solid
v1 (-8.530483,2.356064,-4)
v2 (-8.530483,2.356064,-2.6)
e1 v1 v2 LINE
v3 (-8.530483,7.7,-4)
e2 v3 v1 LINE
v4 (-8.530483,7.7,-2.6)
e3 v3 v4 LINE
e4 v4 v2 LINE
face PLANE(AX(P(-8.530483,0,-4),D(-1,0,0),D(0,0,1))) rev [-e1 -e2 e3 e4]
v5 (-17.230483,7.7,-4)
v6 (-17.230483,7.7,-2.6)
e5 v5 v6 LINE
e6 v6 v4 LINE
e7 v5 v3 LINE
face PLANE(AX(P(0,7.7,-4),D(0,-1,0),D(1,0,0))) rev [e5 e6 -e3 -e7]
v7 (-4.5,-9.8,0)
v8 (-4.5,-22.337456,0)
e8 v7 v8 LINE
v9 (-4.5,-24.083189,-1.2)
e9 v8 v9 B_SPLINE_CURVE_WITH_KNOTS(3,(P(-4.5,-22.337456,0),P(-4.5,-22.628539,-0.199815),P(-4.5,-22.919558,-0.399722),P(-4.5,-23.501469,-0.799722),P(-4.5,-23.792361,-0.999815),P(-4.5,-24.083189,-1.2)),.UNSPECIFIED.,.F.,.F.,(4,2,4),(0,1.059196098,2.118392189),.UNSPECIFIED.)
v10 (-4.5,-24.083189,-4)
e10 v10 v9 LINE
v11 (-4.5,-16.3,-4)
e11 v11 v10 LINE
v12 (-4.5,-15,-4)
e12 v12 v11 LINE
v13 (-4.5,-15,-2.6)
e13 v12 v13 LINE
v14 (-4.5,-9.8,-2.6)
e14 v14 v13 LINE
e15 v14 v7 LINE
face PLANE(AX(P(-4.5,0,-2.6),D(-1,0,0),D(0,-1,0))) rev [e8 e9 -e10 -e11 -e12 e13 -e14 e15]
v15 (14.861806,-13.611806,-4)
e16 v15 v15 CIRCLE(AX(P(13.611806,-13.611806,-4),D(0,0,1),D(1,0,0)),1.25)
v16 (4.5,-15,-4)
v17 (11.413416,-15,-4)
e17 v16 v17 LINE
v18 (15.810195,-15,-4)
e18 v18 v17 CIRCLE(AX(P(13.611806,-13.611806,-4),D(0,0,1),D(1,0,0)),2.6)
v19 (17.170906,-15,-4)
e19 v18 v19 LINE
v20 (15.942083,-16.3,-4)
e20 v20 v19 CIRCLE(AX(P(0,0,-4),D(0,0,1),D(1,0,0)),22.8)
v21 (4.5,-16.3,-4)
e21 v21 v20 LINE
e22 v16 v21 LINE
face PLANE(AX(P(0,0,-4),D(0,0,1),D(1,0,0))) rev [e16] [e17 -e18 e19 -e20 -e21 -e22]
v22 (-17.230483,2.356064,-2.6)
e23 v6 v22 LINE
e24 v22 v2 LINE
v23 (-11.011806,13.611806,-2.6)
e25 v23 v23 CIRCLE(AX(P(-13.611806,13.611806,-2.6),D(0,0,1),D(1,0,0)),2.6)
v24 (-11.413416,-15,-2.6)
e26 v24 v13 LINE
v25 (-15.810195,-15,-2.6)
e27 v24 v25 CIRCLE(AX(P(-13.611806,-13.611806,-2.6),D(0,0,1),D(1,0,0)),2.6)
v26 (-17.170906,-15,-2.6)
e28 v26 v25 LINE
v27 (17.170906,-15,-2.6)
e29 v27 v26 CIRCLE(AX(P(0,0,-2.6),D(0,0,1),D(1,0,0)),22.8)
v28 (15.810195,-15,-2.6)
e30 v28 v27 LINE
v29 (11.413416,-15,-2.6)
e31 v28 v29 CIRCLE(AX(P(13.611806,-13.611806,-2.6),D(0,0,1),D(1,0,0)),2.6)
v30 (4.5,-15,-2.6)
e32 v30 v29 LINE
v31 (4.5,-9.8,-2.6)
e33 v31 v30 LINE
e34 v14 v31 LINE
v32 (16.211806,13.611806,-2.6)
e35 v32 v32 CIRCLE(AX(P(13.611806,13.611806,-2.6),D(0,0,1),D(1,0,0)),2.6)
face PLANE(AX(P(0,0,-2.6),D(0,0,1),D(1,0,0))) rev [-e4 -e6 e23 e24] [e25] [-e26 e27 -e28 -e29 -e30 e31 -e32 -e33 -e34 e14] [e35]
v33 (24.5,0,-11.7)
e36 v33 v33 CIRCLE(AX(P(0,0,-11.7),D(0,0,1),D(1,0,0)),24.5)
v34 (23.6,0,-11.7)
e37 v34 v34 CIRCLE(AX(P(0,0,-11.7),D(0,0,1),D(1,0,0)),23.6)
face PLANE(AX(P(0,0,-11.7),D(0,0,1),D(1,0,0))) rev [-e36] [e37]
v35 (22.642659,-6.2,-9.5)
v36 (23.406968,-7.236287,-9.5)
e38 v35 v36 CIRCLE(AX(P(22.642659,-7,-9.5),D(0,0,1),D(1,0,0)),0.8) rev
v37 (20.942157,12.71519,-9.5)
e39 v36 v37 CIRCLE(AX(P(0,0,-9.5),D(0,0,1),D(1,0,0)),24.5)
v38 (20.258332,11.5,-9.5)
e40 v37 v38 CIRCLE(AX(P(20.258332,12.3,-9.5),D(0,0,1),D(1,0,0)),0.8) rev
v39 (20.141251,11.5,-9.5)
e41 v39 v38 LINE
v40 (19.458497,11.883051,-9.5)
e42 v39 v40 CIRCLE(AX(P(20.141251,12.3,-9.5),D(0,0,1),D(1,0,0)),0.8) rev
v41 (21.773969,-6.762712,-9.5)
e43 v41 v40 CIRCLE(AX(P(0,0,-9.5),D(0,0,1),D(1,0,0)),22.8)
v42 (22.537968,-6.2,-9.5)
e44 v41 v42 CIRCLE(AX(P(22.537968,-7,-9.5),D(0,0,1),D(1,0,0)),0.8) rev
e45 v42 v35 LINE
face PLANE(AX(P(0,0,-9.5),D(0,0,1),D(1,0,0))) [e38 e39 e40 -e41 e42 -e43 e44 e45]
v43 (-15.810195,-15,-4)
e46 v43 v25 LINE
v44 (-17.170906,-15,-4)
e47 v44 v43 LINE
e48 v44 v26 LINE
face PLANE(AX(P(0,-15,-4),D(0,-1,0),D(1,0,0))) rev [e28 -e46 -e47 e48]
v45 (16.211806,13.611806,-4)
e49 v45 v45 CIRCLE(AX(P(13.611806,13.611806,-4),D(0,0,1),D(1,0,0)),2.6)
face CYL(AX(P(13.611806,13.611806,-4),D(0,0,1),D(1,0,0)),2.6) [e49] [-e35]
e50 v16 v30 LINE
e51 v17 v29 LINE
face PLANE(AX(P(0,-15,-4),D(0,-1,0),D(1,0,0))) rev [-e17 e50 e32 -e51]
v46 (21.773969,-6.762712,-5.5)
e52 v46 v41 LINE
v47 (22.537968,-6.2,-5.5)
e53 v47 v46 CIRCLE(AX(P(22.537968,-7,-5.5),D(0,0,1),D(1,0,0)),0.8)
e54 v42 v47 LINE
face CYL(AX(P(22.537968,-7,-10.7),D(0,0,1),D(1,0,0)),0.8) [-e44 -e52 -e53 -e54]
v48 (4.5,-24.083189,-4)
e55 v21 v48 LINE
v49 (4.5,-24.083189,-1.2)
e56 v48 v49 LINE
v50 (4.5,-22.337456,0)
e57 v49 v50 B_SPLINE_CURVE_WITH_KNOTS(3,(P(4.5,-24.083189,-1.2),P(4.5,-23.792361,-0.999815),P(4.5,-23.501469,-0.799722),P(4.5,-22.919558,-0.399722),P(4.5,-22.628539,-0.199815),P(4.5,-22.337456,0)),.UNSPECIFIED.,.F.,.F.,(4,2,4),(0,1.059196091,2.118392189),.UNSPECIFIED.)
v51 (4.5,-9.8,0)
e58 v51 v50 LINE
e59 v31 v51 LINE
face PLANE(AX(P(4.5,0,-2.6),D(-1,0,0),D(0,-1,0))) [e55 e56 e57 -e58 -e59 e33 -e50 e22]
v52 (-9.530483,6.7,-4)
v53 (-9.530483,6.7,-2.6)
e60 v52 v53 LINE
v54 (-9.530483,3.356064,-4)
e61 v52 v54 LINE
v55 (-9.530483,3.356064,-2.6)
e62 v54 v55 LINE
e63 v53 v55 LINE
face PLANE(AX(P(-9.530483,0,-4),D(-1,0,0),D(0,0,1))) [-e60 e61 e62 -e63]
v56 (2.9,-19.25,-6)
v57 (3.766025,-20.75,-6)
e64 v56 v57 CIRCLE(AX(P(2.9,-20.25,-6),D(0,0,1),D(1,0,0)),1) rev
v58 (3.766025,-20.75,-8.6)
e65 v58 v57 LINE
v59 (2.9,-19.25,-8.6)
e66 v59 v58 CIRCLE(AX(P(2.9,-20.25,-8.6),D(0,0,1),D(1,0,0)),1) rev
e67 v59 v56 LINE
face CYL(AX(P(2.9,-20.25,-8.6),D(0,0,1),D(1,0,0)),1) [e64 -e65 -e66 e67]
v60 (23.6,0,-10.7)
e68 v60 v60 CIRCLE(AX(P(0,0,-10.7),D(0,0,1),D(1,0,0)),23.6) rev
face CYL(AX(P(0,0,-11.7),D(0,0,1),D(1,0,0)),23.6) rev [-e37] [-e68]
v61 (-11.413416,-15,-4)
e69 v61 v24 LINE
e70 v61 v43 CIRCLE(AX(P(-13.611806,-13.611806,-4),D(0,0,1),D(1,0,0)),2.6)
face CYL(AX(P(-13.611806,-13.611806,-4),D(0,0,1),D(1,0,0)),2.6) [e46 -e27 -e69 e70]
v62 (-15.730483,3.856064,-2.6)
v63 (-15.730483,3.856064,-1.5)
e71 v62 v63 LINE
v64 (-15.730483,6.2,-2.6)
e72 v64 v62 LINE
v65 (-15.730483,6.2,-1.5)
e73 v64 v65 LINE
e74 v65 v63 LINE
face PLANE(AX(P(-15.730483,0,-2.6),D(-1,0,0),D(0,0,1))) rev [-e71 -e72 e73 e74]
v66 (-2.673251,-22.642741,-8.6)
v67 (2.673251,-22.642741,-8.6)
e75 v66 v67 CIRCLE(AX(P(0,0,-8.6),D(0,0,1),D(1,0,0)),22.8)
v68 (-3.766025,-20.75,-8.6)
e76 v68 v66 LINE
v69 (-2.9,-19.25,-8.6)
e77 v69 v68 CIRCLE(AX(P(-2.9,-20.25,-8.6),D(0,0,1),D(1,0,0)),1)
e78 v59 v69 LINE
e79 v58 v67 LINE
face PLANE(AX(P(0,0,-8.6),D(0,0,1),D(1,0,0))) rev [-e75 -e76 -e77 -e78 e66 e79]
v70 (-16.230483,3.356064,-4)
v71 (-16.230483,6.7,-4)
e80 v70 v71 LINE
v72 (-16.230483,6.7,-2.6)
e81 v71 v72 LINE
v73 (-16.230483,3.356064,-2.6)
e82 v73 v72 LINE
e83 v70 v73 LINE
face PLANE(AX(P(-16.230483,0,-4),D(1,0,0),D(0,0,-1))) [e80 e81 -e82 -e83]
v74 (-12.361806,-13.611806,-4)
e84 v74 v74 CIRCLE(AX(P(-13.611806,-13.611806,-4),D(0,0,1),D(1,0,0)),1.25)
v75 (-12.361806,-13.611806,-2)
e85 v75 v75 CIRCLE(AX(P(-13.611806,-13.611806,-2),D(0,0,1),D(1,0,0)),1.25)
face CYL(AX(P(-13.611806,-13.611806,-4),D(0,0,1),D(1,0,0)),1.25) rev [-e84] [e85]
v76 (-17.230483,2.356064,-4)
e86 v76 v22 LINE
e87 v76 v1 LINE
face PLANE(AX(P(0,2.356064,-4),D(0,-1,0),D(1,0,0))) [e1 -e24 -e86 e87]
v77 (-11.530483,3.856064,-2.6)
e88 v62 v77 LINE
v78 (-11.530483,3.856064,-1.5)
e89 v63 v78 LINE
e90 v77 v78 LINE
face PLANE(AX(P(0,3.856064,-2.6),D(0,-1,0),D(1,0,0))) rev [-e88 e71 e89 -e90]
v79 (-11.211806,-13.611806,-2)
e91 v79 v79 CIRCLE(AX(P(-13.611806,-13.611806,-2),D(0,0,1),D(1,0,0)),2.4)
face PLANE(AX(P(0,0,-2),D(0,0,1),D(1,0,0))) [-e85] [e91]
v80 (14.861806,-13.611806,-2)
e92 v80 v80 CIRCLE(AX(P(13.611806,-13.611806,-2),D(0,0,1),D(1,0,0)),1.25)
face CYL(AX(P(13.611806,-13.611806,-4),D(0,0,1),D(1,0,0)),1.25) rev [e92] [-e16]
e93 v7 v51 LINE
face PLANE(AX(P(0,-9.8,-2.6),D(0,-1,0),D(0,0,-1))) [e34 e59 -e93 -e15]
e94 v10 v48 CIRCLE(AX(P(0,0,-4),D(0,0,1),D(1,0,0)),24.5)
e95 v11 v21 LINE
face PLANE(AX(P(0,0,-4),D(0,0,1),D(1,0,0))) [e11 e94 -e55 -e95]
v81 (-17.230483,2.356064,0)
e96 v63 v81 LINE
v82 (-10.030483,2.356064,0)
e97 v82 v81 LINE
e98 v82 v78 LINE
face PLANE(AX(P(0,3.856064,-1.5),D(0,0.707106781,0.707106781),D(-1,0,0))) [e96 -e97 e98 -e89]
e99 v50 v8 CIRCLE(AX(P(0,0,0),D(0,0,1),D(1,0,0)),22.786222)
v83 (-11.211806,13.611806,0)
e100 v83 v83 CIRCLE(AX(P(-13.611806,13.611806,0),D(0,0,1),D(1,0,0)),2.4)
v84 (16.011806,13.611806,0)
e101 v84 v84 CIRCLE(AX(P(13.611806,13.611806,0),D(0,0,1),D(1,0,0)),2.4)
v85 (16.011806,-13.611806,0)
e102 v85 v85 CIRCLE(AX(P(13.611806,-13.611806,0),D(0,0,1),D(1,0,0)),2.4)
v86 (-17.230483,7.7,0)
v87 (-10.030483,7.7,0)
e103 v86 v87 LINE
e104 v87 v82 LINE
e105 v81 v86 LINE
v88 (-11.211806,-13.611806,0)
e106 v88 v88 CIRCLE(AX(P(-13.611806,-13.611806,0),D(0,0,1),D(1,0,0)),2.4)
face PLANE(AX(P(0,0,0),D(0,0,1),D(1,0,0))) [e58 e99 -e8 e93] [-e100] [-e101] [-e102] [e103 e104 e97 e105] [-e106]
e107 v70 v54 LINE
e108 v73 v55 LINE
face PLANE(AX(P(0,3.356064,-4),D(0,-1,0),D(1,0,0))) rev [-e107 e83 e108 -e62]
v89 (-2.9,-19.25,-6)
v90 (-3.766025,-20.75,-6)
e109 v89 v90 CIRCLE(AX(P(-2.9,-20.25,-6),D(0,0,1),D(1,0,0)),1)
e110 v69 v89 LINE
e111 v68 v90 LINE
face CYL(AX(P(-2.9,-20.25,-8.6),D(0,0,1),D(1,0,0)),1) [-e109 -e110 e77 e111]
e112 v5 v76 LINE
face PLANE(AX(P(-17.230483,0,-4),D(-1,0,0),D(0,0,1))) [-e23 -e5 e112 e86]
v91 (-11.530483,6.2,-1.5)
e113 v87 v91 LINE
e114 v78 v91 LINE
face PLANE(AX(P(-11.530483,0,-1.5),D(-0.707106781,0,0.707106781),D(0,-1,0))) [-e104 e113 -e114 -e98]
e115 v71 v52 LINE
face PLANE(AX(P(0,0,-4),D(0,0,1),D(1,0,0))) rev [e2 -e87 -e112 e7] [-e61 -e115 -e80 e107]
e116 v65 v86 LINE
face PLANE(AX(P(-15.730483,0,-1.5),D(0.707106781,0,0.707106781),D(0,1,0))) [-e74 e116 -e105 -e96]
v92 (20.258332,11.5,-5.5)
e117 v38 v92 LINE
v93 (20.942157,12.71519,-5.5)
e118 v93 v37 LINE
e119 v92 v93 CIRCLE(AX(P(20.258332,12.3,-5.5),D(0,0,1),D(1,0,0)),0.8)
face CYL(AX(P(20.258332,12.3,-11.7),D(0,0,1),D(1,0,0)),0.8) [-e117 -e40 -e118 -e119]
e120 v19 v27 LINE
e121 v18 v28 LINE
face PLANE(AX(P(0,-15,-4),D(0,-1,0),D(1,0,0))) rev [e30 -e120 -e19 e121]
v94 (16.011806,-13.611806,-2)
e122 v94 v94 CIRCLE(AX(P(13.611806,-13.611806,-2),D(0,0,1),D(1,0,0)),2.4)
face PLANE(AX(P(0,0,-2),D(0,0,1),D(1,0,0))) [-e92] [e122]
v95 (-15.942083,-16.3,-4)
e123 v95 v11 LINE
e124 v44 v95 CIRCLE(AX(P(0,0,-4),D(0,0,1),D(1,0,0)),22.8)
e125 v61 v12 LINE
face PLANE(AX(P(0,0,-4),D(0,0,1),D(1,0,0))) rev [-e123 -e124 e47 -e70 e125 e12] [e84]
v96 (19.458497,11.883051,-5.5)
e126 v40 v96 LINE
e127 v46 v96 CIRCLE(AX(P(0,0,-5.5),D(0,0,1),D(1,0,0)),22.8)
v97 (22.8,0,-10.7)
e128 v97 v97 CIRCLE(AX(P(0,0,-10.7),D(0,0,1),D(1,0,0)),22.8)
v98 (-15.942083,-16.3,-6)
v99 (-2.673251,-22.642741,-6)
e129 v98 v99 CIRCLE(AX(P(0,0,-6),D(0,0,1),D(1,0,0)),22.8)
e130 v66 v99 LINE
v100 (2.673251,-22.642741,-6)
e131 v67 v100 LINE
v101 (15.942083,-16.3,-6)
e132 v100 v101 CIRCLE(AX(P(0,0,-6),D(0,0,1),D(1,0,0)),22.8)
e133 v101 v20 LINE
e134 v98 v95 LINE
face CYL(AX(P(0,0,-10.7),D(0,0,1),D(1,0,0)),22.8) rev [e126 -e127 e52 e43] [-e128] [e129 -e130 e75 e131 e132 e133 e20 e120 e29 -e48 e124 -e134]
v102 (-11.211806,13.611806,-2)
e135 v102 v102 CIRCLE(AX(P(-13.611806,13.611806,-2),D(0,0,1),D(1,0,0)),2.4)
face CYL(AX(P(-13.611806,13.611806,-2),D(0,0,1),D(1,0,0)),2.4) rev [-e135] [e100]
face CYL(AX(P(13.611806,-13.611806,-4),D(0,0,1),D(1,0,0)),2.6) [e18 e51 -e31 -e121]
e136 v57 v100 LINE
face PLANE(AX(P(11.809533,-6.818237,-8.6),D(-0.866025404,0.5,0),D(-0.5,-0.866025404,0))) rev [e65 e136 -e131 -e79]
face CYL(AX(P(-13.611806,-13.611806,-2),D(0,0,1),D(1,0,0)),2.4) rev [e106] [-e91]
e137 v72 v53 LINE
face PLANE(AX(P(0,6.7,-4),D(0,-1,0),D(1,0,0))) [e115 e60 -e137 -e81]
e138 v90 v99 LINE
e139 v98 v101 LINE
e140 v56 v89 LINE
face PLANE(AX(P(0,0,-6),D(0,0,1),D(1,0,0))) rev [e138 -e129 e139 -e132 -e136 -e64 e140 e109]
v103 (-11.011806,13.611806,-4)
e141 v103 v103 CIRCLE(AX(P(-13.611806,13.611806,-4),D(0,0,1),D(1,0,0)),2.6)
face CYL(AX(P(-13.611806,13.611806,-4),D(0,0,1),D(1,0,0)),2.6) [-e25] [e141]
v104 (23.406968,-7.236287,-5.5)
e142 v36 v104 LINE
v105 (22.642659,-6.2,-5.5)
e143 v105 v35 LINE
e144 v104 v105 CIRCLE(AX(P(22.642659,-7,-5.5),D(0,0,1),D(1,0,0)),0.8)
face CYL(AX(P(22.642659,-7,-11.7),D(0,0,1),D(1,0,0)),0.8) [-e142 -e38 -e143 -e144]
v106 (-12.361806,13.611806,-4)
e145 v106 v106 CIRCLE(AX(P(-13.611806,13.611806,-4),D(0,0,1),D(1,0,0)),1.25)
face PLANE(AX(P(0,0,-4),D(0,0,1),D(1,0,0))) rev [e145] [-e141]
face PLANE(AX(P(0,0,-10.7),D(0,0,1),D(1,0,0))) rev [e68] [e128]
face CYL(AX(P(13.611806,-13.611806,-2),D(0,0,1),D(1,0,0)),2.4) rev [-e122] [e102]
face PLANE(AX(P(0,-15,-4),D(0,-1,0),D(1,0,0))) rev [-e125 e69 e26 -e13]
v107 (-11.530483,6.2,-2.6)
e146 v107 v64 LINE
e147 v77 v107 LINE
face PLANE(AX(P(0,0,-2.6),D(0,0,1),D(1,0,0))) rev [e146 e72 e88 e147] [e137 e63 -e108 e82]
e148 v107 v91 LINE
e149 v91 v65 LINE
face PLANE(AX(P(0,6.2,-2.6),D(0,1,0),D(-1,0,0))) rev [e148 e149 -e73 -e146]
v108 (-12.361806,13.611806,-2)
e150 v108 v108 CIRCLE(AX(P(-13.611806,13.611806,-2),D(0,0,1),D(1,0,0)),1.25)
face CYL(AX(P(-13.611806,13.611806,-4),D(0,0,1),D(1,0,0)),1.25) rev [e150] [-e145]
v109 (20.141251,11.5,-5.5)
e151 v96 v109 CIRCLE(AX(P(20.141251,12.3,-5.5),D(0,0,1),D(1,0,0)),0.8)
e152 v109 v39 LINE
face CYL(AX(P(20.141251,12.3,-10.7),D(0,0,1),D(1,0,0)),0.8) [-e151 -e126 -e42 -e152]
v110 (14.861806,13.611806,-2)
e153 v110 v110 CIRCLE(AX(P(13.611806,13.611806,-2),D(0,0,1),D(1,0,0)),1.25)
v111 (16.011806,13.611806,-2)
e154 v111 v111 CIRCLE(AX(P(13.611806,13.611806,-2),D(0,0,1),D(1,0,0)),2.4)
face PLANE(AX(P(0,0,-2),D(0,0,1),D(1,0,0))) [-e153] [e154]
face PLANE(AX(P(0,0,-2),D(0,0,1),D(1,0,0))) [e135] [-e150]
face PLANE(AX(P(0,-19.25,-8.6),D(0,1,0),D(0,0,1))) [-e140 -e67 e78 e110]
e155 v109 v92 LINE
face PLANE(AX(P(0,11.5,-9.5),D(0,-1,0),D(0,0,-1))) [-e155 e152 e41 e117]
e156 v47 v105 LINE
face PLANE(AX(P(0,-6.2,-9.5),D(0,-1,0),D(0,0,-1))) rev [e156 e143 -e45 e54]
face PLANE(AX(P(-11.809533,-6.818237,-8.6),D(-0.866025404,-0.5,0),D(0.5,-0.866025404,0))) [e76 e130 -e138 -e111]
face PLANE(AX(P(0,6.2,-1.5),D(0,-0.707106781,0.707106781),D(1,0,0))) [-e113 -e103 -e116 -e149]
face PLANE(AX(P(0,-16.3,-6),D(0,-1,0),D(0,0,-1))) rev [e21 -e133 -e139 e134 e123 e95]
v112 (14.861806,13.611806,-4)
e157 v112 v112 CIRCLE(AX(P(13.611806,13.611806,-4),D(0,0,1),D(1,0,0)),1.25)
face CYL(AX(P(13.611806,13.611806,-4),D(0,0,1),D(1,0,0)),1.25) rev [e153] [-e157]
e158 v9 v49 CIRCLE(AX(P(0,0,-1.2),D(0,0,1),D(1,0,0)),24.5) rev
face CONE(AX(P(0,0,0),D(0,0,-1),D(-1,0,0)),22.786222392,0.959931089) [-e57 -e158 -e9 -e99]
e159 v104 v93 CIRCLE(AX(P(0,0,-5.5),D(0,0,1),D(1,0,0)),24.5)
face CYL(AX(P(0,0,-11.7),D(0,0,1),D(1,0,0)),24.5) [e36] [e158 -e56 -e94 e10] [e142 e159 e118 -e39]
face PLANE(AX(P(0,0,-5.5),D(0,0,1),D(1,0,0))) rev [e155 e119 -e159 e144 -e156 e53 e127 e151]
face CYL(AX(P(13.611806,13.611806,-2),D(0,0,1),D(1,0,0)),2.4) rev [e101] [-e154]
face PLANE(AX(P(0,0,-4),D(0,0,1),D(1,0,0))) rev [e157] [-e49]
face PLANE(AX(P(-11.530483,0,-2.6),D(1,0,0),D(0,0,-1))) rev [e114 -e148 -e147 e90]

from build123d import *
from build123d.topology import SkipClean

# Parameters (mm, degrees)
EXTRUDE_3_DEPTH     = 11.7
SKETCH_2_5_R        = 23.6
SKETCH_2_5_R_2      = 22.8
EXTRUDE_4_DEPTH     = 10.7
SKETCH_2_6_R        = 2.6
SKETCH_2_6_W        = 4.2
SKETCH_2_6_H        = 2.343935591
EXTRUDE_5_DEPTH     = 2.6
EXTRUDE_6_DEPTH     = 4
SKETCH_2_9_R        = 2.6
SKETCH_2_9_R_2      = 1.25
SKETCH_2_9_R_3      = 2.4
SKETCH_2_9_W        = 8.7
SKETCH_2_9_H        = 5.343935591
SKETCH_2_9_W_2      = 6.7
SKETCH_2_9_H_2      = 3.343935591
EXTRUDE_7_DEPTH     = 4
EXTRUDE_8_DEPTH     = 6
EXTRUDE_10_DEPTH    = 8.6
CUT_EXTRUDE_1_DEPTH = 4
CUT_EXTRUDE_2_DEPTH = 9.5
EXTRUDE_9_DEPTH     = 5.5
SKETCH_2_15_R       = 2.4
SKETCH_2_15_R_2     = 1.25
CUT_EXTRUDE_3_DEPTH = 2
CHAMFER_2_SIZE      = 1.5
FILLET_2_R          = 0.8
FILLET_3_R          = 0.8
FILLET_4_R          = 0.8
FILLET_5_R          = 0.8
CHAMFER_3_SIZE      = 1.2
CHAMFER_3_SIZE2     = 1.713777608


with BuildPart() as part:
    # 草图2 → 凸台-拉伸3 (new body)
    with BuildSketch(Plane.XY):
        with BuildLine():
            ThreePointArc((21.633307653, 11.5), (-14.000099508, 20.105899974), (-18.290981384, -16.3))
            Line((-18.290981384, -16.3), (-17.066634115, -16.3))
            ThreePointArc((-17.066634115, -16.3), (-14.012358538, 18.989834339), (20.608493395, 11.5))
            Line((20.608493395, 11.5), (21.633307653, 11.5))
        make_face()
        with BuildLine():
            ThreePointArc((24.5, 0), (23.772526554, 5.925958256), (21.633307653, 11.5))
            Line((21.633307653, 11.5), (20.608493395, 11.5))
            ThreePointArc((20.608493395, 11.5), (22.839882269, 5.941361624), (23.6, 0))
            ThreePointArc((23.6, 0), (23.391840542, -3.1275863), (22.771034232, -6.2))
            Line((22.771034232, -6.2), (23.70253151, -6.2))
            ThreePointArc((23.70253151, -6.2), (24.29981504, -3.125538193), (24.5, 0))
        make_face()
        with BuildLine():
            ThreePointArc((18.290981384, -16.3), (21.595515305, -11.570813225), (23.70253151, -6.2))
            Line((23.70253151, -6.2), (22.771034232, -6.2))
            ThreePointArc((22.771034232, -6.2), (20.549025642, -11.605927157), (17.066634115, -16.3))
            Line((17.066634115, -16.3), (18.290981384, -16.3))
        make_face()
        with BuildLine():
            Line((4.5, -23.167002396), (4.5, -24.083189158))
            ThreePointArc((4.5, -24.083189158), (12.041665852, -21.336548069), (18.290981384, -16.3))
            Line((18.290981384, -16.3), (17.066634115, -16.3))
            ThreePointArc((17.066634115, -16.3), (11.316751178, -20.709687172), (4.5, -23.167002396))
        make_face()
        with BuildLine():
            Line((-4.5, -23.167002396), (-4.5, -24.083189158))
            ThreePointArc((-4.5, -24.083189158), (0, -24.5), (4.5, -24.083189158))
            Line((4.5, -24.083189158), (4.5, -23.167002396))
            ThreePointArc((4.5, -23.167002396), (0, -23.6), (-4.5, -23.167002396))
        make_face()
        with BuildLine():
            Line((-17.066634115, -16.3), (-18.290981384, -16.3))
            ThreePointArc((-18.290981384, -16.3), (-12.041665852, -21.336548069), (-4.5, -24.083189158))
            Line((-4.5, -24.083189158), (-4.5, -23.167002396))
            ThreePointArc((-4.5, -23.167002396), (-11.316751178, -20.709687172), (-17.066634115, -16.3))
        make_face()
    extrude(amount=-EXTRUDE_3_DEPTH)

    # 草图2<5> → 凸台-拉伸4 (add)
    with BuildSketch(Plane.XY):
        Circle(SKETCH_2_5_R)
        Circle(SKETCH_2_5_R_2, mode=Mode.SUBTRACT)
    extrude(amount=-EXTRUDE_4_DEPTH)

    # 草图2<6> → 凸台-拉伸5 (add)
    with BuildSketch(Plane.XY):
        with BuildLine():
            ThreePointArc((17.170905626, -15), (0, 22.8), (-17.170905626, -15))
            Line((-17.170905626, -15), (-15.810194979, -15))
            ThreePointArc((-15.810194979, -15), (-13.611805538, -11.011805538), (-11.413416097, -15))
            Line((-11.413416097, -15), (-4.5, -15))
            Line((-4.5, -15), (-4.5, -9.8))
            Line((-4.5, -9.8), (4.5, -9.8))
            Line((4.5, -9.8), (4.5, -15))
            Line((4.5, -15), (11.413416097, -15))
            ThreePointArc((11.413416097, -15), (13.611805538, -11.011805538), (15.810194979, -15))
            Line((15.810194979, -15), (17.170905626, -15))
        make_face()
        with Locations((-13.611805538, 13.611805538)):
            Circle(SKETCH_2_6_R, mode=Mode.SUBTRACT)
        with Locations((13.611805538, 13.611805538)):
            Circle(SKETCH_2_6_R, mode=Mode.SUBTRACT)
        with Locations((-13.63048294, 5.028032205)):
            Rectangle(SKETCH_2_6_W, SKETCH_2_6_H, mode=Mode.SUBTRACT)
    extrude(amount=-EXTRUDE_5_DEPTH)

    # 草图2<7> → 凸台-拉伸6 (add)
    with BuildSketch(Plane.XY):
        with BuildLine():
            ThreePointArc((-17.170905626, -15), (-16.569248581, -15.662056106), (-15.942082674, -16.3))
            Line((-15.942082674, -16.3), (-4.5, -16.3))
            Line((-4.5, -16.3), (-4.5, -15))
            Line((-4.5, -15), (-11.413416097, -15))
            ThreePointArc((-11.413416097, -15), (-13.611805538, -16.211805538), (-15.810194979, -15))
            Line((-15.810194979, -15), (-17.170905626, -15))
        make_face()
        with BuildLine():
            Line((4.5, -15), (4.5, -16.3))
            Line((4.5, -16.3), (15.942082674, -16.3))
            ThreePointArc((15.942082674, -16.3), (16.569248581, -15.662056106), (17.170905626, -15))
            Line((17.170905626, -15), (15.810194979, -15))
            ThreePointArc((15.810194979, -15), (13.611805538, -16.211805538), (11.413416097, -15))
            Line((11.413416097, -15), (4.5, -15))
        make_face()
    extrude(amount=-EXTRUDE_6_DEPTH)

    # 草图2<9> → 凸台-拉伸7 (add)
    # profile 1 of 9: a face of its own
    with BuildSketch(Plane.XY):
        with Locations((-13.611805538, 13.611805538)):
            Circle(SKETCH_2_9_R)
        with Locations((-13.611805538, 13.611805538)):
            Circle(SKETCH_2_9_R_2, mode=Mode.SUBTRACT)
    # profile 2 of 9: a face of its own
    with BuildSketch(Plane.XY):
        with Locations((13.611805538, 13.611805538)):
            Circle(SKETCH_2_9_R)
        with Locations((13.611805538, 13.611805538)):
            Circle(SKETCH_2_9_R_2, mode=Mode.SUBTRACT)
    # profile 3 of 9: a face of its own
    with BuildSketch(Plane.XY):
        with Locations((-13.611805538, 13.611805538)):
            Circle(SKETCH_2_9_R)
        with Locations((-13.611805538, 13.611805538)):
            Circle(SKETCH_2_9_R_3, mode=Mode.SUBTRACT)
    # profile 4 of 9: a face of its own
    with BuildSketch(Plane.XY):
        with Locations((13.611805538, 13.611805538)):
            Circle(SKETCH_2_9_R)
        with Locations((13.611805538, 13.611805538)):
            Circle(SKETCH_2_9_R_3, mode=Mode.SUBTRACT)
    # profile 5 of 9: a face of its own
    with BuildSketch(Plane.XY):
        with Locations((13.611805538, -13.611805538)):
            Circle(SKETCH_2_9_R)
        with Locations((13.611805538, -13.611805538)):
            Circle(SKETCH_2_9_R_3, mode=Mode.SUBTRACT)
    # profile 6 of 9: a face of its own
    with BuildSketch(Plane.XY):
        with Locations((-13.611805538, -13.611805538)):
            Circle(SKETCH_2_9_R)
        with Locations((-13.611805538, -13.611805538)):
            Circle(SKETCH_2_9_R_3, mode=Mode.SUBTRACT)
    # profile 7 of 9: a face of its own
    with BuildSketch(Plane.XY):
        with Locations((-13.611805538, -13.611805538)):
            Circle(SKETCH_2_9_R_3)
        with Locations((-13.611805538, -13.611805538)):
            Circle(SKETCH_2_9_R_2, mode=Mode.SUBTRACT)
    # profile 8 of 9: a face of its own
    with BuildSketch(Plane.XY):
        with Locations((13.611805538, -13.611805538)):
            Circle(SKETCH_2_9_R_3)
        with Locations((13.611805538, -13.611805538)):
            Circle(SKETCH_2_9_R_2, mode=Mode.SUBTRACT)
    # profile 9 of 9: a face of its own
    with BuildSketch(Plane.XY):
        with Locations((-12.88048294, 5.028032205)):
            Rectangle(SKETCH_2_9_W, SKETCH_2_9_H)
        with Locations((-12.88048294, 5.028032205)):
            Rectangle(SKETCH_2_9_W_2, SKETCH_2_9_H_2, mode=Mode.SUBTRACT)
    extrude(amount=-EXTRUDE_7_DEPTH)

    # 草图2<11> → 凸台-拉伸8 (add)
    with BuildSketch(Plane.XY):
        with BuildLine():
            ThreePointArc((-15.942082674, -16.3), (-9.833120113, -20.570603998), (-2.673250745, -22.642741231))
            Line((-2.673250745, -22.642741231), (-3.766025404, -20.75))
            ThreePointArc((-3.766025404, -20.75), (-3.766025404, -19.75), (-2.9, -19.25))
            Line((-2.9, -19.25), (2.9, -19.25))
            ThreePointArc((2.9, -19.25), (3.766025404, -19.75), (3.766025404, -20.75))
            Line((3.766025404, -20.75), (2.673250745, -22.642741231))
            ThreePointArc((2.673250745, -22.642741231), (9.833120113, -20.570603998), (15.942082674, -16.3))
            Line((15.942082674, -16.3), (-15.942082674, -16.3))
        make_face()
    extrude(amount=-EXTRUDE_8_DEPTH)

    # 草图2<17> → 凸台-拉伸10 (add)
    with BuildSketch(Plane.XY):
        with BuildLine():
            Line((-3.766025404, -20.75), (-2.673250745, -22.642741231))
            ThreePointArc((-2.673250745, -22.642741231), (0, -22.8), (2.673250745, -22.642741231))
            Line((2.673250745, -22.642741231), (3.766025404, -20.75))
            ThreePointArc((3.766025404, -20.75), (3.766025404, -19.75), (2.9, -19.25))
            Line((2.9, -19.25), (-2.9, -19.25))
            ThreePointArc((-2.9, -19.25), (-3.766025404, -19.75), (-3.766025404, -20.75))
        make_face()
    extrude(amount=-EXTRUDE_10_DEPTH)

    # 草图2<10> → 切除-拉伸1 (cut)
    with BuildSketch(Plane.XY):
        with BuildLine():
            ThreePointArc((-4.5, -24.083189158), (0, -24.5), (4.5, -24.083189158))
            Line((4.5, -24.083189158), (4.5, -16.3))
            Line((4.5, -16.3), (-4.5, -16.3))
            Line((-4.5, -16.3), (-4.5, -24.083189158))
        make_face()
    extrude(amount=-CUT_EXTRUDE_1_DEPTH, mode=Mode.SUBTRACT)

    # 草图2<13> → 切除-拉伸2 (cut)
    with BuildSketch(Plane.XY):
        with BuildLine():
            ThreePointArc((24.5, 0), (23.772526554, 5.925958256), (21.633307653, 11.5))
            Line((21.633307653, 11.5), (20.608493395, 11.5))
            ThreePointArc((20.608493395, 11.5), (22.839882269, 5.941361624), (23.6, 0))
            ThreePointArc((23.6, 0), (23.391840542, -3.1275863), (22.771034232, -6.2))
            Line((22.771034232, -6.2), (23.70253151, -6.2))
            ThreePointArc((23.70253151, -6.2), (24.29981504, -3.125538193), (24.5, 0))
        make_face()
        with BuildLine():
            ThreePointArc((23.6, 0), (22.839882269, 5.941361624), (20.608493395, 11.5))
            Line((20.608493395, 11.5), (19.687305555, 11.5))
            ThreePointArc((19.687305555, 11.5), (22.00807314, 5.956904958), (22.8, 0))
            ThreePointArc((22.8, 0), (22.584185983, -3.129623536), (21.940829519, -6.2))
            Line((21.940829519, -6.2), (22.771034232, -6.2))
            ThreePointArc((22.771034232, -6.2), (23.391840542, -3.1275863), (23.6, 0))
        make_face()
    extrude(amount=-CUT_EXTRUDE_2_DEPTH, mode=Mode.SUBTRACT)

    # 草图2<14> → 凸台-拉伸9 (add)
    with SkipClean():  # the faces are left unmerged after this step: merging them gives an invalid solid
        with BuildSketch(Plane.XY):
            with BuildLine():
                ThreePointArc((24.5, 0), (23.772526554, 5.925958256), (21.633307653, 11.5))
                Line((21.633307653, 11.5), (20.608493395, 11.5))
                ThreePointArc((20.608493395, 11.5), (22.839882269, 5.941361624), (23.6, 0))
                ThreePointArc((23.6, 0), (23.391840542, -3.1275863), (22.771034232, -6.2))
                Line((22.771034232, -6.2), (23.70253151, -6.2))
                ThreePointArc((23.70253151, -6.2), (24.29981504, -3.125538193), (24.5, 0))
            make_face()
            with BuildLine():
                ThreePointArc((23.6, 0), (22.839882269, 5.941361624), (20.608493395, 11.5))
                Line((20.608493395, 11.5), (19.687305555, 11.5))
                ThreePointArc((19.687305555, 11.5), (22.00807314, 5.956904958), (22.8, 0))
                ThreePointArc((22.8, 0), (22.584185983, -3.129623536), (21.940829519, -6.2))
                Line((21.940829519, -6.2), (22.771034232, -6.2))
                ThreePointArc((22.771034232, -6.2), (23.391840542, -3.1275863), (23.6, 0))
            make_face()
        extrude(amount=-EXTRUDE_9_DEPTH)

    # 草图2<15> → 切除-拉伸3 (cut)
    # profile 1 of 4: a face of its own
    with SkipClean():  # the faces are left unmerged after this step: merging them gives an invalid solid
        with BuildSketch(Plane.XY):
            with Locations((-13.611805538, 13.611805538)):
                Circle(SKETCH_2_15_R)
            with Locations((-13.611805538, 13.611805538)):
                Circle(SKETCH_2_15_R_2, mode=Mode.SUBTRACT)
        # profile 2 of 4: a face of its own
        with BuildSketch(Plane.XY):
            with Locations((13.611805538, 13.611805538)):
                Circle(SKETCH_2_15_R)
            with Locations((13.611805538, 13.611805538)):
                Circle(SKETCH_2_15_R_2, mode=Mode.SUBTRACT)
        # profile 3 of 4: a face of its own
        with BuildSketch(Plane.XY):
            with Locations((13.611805538, -13.611805538)):
                Circle(SKETCH_2_15_R)
            with Locations((13.611805538, -13.611805538)):
                Circle(SKETCH_2_15_R_2, mode=Mode.SUBTRACT)
        # profile 4 of 4: a face of its own
        with BuildSketch(Plane.XY):
            with Locations((-13.611805538, -13.611805538)):
                Circle(SKETCH_2_15_R)
            with Locations((-13.611805538, -13.611805538)):
                Circle(SKETCH_2_15_R_2, mode=Mode.SUBTRACT)
        extrude(amount=-CUT_EXTRUDE_3_DEPTH, mode=Mode.SUBTRACT)

    # 倒角2
    chamfer_2_edges = [part.edges().sort_by_distance(p)[0] for p in [
        (-13.63048294, 6.2, 0),
        (-15.73048294, 5.028032204, 0),
        (-13.63048294, 3.856064409, 0),
        (-11.53048294, 5.028032204, 0),
    ]]
    chamfer(chamfer_2_edges, length=CHAMFER_2_SIZE)

    # 圆角2
    # the kernel refuses this fillet: 0.8 mm, written as the material it takes off along each edge
    with BuildSketch(Plane(origin=(21.633307653, 11.5, -5.5), x_dir=(-0.49438880167130195, 0.8692408830594739, 0), z_dir=(0, 0, -1))) as fillet_2_piece_1:
        with BuildLine():
            CenterArc((1.37516546, -0.79967434), FILLET_2_R, 88.365106431, 121.26434887)
            Line((0.679772753, -1.195185381), (0, 0))
            ThreePointArc((0, 0), (0.698994891, 0.009973333), (1.397989783, 0))
        make_face()
    extrude(amount=4, mode=Mode.SUBTRACT)

    # 圆角3
    # the kernel refuses this fillet: 0.8 mm, written as the material it takes off along each edge
    with BuildSketch(Plane(origin=(23.70253151, -6.2, -5.5), x_dir=(-0.27427627228974394, -0.9616509379493383, 0), z_dir=(0, 0, -1))) as fillet_3_piece_1:
        with BuildLine():
            CenterArc((1.060018672, 0.799806516), FILLET_3_R, 164.081110631, 107.179044823)
            Line((0.290697921, 1.019227534), (0, 0))
            ThreePointArc((0, 0), (0.538806171, -0.005925453), (1.077612342, 0))
        make_face()
    extrude(amount=4, mode=Mode.SUBTRACT)

    # 圆角4
    fillet_4_edges = [part.edges().sort_by_distance(p)[0] for p in [
        (21.940829519, -6.2, -7.5),
    ]]
    fillet(fillet_4_edges, radius=FILLET_4_R)

    # 圆角5
    fillet_5_edges = [part.edges().sort_by_distance(p)[0] for p in [
        (19.687305555, 11.5, -7.5),
    ]]
    fillet(fillet_5_edges, radius=FILLET_5_R)

    # 倒角3
    chamfer_3_edges = [part.edges().sort_by_distance(p)[0] for p in [
        (-14.000099508, 20.105899974, 0),
    ]]
    chamfer_3_side = [part.faces().sort_by_distance(p)[0] for p in [
        (18.290981384, 16.3, -5.85),
    ]]
    chamfer(chamfer_3_edges, length=CHAMFER_3_SIZE, length2=CHAMFER_3_SIZE2, reference=chamfer_3_side[0])


solid = part.part
